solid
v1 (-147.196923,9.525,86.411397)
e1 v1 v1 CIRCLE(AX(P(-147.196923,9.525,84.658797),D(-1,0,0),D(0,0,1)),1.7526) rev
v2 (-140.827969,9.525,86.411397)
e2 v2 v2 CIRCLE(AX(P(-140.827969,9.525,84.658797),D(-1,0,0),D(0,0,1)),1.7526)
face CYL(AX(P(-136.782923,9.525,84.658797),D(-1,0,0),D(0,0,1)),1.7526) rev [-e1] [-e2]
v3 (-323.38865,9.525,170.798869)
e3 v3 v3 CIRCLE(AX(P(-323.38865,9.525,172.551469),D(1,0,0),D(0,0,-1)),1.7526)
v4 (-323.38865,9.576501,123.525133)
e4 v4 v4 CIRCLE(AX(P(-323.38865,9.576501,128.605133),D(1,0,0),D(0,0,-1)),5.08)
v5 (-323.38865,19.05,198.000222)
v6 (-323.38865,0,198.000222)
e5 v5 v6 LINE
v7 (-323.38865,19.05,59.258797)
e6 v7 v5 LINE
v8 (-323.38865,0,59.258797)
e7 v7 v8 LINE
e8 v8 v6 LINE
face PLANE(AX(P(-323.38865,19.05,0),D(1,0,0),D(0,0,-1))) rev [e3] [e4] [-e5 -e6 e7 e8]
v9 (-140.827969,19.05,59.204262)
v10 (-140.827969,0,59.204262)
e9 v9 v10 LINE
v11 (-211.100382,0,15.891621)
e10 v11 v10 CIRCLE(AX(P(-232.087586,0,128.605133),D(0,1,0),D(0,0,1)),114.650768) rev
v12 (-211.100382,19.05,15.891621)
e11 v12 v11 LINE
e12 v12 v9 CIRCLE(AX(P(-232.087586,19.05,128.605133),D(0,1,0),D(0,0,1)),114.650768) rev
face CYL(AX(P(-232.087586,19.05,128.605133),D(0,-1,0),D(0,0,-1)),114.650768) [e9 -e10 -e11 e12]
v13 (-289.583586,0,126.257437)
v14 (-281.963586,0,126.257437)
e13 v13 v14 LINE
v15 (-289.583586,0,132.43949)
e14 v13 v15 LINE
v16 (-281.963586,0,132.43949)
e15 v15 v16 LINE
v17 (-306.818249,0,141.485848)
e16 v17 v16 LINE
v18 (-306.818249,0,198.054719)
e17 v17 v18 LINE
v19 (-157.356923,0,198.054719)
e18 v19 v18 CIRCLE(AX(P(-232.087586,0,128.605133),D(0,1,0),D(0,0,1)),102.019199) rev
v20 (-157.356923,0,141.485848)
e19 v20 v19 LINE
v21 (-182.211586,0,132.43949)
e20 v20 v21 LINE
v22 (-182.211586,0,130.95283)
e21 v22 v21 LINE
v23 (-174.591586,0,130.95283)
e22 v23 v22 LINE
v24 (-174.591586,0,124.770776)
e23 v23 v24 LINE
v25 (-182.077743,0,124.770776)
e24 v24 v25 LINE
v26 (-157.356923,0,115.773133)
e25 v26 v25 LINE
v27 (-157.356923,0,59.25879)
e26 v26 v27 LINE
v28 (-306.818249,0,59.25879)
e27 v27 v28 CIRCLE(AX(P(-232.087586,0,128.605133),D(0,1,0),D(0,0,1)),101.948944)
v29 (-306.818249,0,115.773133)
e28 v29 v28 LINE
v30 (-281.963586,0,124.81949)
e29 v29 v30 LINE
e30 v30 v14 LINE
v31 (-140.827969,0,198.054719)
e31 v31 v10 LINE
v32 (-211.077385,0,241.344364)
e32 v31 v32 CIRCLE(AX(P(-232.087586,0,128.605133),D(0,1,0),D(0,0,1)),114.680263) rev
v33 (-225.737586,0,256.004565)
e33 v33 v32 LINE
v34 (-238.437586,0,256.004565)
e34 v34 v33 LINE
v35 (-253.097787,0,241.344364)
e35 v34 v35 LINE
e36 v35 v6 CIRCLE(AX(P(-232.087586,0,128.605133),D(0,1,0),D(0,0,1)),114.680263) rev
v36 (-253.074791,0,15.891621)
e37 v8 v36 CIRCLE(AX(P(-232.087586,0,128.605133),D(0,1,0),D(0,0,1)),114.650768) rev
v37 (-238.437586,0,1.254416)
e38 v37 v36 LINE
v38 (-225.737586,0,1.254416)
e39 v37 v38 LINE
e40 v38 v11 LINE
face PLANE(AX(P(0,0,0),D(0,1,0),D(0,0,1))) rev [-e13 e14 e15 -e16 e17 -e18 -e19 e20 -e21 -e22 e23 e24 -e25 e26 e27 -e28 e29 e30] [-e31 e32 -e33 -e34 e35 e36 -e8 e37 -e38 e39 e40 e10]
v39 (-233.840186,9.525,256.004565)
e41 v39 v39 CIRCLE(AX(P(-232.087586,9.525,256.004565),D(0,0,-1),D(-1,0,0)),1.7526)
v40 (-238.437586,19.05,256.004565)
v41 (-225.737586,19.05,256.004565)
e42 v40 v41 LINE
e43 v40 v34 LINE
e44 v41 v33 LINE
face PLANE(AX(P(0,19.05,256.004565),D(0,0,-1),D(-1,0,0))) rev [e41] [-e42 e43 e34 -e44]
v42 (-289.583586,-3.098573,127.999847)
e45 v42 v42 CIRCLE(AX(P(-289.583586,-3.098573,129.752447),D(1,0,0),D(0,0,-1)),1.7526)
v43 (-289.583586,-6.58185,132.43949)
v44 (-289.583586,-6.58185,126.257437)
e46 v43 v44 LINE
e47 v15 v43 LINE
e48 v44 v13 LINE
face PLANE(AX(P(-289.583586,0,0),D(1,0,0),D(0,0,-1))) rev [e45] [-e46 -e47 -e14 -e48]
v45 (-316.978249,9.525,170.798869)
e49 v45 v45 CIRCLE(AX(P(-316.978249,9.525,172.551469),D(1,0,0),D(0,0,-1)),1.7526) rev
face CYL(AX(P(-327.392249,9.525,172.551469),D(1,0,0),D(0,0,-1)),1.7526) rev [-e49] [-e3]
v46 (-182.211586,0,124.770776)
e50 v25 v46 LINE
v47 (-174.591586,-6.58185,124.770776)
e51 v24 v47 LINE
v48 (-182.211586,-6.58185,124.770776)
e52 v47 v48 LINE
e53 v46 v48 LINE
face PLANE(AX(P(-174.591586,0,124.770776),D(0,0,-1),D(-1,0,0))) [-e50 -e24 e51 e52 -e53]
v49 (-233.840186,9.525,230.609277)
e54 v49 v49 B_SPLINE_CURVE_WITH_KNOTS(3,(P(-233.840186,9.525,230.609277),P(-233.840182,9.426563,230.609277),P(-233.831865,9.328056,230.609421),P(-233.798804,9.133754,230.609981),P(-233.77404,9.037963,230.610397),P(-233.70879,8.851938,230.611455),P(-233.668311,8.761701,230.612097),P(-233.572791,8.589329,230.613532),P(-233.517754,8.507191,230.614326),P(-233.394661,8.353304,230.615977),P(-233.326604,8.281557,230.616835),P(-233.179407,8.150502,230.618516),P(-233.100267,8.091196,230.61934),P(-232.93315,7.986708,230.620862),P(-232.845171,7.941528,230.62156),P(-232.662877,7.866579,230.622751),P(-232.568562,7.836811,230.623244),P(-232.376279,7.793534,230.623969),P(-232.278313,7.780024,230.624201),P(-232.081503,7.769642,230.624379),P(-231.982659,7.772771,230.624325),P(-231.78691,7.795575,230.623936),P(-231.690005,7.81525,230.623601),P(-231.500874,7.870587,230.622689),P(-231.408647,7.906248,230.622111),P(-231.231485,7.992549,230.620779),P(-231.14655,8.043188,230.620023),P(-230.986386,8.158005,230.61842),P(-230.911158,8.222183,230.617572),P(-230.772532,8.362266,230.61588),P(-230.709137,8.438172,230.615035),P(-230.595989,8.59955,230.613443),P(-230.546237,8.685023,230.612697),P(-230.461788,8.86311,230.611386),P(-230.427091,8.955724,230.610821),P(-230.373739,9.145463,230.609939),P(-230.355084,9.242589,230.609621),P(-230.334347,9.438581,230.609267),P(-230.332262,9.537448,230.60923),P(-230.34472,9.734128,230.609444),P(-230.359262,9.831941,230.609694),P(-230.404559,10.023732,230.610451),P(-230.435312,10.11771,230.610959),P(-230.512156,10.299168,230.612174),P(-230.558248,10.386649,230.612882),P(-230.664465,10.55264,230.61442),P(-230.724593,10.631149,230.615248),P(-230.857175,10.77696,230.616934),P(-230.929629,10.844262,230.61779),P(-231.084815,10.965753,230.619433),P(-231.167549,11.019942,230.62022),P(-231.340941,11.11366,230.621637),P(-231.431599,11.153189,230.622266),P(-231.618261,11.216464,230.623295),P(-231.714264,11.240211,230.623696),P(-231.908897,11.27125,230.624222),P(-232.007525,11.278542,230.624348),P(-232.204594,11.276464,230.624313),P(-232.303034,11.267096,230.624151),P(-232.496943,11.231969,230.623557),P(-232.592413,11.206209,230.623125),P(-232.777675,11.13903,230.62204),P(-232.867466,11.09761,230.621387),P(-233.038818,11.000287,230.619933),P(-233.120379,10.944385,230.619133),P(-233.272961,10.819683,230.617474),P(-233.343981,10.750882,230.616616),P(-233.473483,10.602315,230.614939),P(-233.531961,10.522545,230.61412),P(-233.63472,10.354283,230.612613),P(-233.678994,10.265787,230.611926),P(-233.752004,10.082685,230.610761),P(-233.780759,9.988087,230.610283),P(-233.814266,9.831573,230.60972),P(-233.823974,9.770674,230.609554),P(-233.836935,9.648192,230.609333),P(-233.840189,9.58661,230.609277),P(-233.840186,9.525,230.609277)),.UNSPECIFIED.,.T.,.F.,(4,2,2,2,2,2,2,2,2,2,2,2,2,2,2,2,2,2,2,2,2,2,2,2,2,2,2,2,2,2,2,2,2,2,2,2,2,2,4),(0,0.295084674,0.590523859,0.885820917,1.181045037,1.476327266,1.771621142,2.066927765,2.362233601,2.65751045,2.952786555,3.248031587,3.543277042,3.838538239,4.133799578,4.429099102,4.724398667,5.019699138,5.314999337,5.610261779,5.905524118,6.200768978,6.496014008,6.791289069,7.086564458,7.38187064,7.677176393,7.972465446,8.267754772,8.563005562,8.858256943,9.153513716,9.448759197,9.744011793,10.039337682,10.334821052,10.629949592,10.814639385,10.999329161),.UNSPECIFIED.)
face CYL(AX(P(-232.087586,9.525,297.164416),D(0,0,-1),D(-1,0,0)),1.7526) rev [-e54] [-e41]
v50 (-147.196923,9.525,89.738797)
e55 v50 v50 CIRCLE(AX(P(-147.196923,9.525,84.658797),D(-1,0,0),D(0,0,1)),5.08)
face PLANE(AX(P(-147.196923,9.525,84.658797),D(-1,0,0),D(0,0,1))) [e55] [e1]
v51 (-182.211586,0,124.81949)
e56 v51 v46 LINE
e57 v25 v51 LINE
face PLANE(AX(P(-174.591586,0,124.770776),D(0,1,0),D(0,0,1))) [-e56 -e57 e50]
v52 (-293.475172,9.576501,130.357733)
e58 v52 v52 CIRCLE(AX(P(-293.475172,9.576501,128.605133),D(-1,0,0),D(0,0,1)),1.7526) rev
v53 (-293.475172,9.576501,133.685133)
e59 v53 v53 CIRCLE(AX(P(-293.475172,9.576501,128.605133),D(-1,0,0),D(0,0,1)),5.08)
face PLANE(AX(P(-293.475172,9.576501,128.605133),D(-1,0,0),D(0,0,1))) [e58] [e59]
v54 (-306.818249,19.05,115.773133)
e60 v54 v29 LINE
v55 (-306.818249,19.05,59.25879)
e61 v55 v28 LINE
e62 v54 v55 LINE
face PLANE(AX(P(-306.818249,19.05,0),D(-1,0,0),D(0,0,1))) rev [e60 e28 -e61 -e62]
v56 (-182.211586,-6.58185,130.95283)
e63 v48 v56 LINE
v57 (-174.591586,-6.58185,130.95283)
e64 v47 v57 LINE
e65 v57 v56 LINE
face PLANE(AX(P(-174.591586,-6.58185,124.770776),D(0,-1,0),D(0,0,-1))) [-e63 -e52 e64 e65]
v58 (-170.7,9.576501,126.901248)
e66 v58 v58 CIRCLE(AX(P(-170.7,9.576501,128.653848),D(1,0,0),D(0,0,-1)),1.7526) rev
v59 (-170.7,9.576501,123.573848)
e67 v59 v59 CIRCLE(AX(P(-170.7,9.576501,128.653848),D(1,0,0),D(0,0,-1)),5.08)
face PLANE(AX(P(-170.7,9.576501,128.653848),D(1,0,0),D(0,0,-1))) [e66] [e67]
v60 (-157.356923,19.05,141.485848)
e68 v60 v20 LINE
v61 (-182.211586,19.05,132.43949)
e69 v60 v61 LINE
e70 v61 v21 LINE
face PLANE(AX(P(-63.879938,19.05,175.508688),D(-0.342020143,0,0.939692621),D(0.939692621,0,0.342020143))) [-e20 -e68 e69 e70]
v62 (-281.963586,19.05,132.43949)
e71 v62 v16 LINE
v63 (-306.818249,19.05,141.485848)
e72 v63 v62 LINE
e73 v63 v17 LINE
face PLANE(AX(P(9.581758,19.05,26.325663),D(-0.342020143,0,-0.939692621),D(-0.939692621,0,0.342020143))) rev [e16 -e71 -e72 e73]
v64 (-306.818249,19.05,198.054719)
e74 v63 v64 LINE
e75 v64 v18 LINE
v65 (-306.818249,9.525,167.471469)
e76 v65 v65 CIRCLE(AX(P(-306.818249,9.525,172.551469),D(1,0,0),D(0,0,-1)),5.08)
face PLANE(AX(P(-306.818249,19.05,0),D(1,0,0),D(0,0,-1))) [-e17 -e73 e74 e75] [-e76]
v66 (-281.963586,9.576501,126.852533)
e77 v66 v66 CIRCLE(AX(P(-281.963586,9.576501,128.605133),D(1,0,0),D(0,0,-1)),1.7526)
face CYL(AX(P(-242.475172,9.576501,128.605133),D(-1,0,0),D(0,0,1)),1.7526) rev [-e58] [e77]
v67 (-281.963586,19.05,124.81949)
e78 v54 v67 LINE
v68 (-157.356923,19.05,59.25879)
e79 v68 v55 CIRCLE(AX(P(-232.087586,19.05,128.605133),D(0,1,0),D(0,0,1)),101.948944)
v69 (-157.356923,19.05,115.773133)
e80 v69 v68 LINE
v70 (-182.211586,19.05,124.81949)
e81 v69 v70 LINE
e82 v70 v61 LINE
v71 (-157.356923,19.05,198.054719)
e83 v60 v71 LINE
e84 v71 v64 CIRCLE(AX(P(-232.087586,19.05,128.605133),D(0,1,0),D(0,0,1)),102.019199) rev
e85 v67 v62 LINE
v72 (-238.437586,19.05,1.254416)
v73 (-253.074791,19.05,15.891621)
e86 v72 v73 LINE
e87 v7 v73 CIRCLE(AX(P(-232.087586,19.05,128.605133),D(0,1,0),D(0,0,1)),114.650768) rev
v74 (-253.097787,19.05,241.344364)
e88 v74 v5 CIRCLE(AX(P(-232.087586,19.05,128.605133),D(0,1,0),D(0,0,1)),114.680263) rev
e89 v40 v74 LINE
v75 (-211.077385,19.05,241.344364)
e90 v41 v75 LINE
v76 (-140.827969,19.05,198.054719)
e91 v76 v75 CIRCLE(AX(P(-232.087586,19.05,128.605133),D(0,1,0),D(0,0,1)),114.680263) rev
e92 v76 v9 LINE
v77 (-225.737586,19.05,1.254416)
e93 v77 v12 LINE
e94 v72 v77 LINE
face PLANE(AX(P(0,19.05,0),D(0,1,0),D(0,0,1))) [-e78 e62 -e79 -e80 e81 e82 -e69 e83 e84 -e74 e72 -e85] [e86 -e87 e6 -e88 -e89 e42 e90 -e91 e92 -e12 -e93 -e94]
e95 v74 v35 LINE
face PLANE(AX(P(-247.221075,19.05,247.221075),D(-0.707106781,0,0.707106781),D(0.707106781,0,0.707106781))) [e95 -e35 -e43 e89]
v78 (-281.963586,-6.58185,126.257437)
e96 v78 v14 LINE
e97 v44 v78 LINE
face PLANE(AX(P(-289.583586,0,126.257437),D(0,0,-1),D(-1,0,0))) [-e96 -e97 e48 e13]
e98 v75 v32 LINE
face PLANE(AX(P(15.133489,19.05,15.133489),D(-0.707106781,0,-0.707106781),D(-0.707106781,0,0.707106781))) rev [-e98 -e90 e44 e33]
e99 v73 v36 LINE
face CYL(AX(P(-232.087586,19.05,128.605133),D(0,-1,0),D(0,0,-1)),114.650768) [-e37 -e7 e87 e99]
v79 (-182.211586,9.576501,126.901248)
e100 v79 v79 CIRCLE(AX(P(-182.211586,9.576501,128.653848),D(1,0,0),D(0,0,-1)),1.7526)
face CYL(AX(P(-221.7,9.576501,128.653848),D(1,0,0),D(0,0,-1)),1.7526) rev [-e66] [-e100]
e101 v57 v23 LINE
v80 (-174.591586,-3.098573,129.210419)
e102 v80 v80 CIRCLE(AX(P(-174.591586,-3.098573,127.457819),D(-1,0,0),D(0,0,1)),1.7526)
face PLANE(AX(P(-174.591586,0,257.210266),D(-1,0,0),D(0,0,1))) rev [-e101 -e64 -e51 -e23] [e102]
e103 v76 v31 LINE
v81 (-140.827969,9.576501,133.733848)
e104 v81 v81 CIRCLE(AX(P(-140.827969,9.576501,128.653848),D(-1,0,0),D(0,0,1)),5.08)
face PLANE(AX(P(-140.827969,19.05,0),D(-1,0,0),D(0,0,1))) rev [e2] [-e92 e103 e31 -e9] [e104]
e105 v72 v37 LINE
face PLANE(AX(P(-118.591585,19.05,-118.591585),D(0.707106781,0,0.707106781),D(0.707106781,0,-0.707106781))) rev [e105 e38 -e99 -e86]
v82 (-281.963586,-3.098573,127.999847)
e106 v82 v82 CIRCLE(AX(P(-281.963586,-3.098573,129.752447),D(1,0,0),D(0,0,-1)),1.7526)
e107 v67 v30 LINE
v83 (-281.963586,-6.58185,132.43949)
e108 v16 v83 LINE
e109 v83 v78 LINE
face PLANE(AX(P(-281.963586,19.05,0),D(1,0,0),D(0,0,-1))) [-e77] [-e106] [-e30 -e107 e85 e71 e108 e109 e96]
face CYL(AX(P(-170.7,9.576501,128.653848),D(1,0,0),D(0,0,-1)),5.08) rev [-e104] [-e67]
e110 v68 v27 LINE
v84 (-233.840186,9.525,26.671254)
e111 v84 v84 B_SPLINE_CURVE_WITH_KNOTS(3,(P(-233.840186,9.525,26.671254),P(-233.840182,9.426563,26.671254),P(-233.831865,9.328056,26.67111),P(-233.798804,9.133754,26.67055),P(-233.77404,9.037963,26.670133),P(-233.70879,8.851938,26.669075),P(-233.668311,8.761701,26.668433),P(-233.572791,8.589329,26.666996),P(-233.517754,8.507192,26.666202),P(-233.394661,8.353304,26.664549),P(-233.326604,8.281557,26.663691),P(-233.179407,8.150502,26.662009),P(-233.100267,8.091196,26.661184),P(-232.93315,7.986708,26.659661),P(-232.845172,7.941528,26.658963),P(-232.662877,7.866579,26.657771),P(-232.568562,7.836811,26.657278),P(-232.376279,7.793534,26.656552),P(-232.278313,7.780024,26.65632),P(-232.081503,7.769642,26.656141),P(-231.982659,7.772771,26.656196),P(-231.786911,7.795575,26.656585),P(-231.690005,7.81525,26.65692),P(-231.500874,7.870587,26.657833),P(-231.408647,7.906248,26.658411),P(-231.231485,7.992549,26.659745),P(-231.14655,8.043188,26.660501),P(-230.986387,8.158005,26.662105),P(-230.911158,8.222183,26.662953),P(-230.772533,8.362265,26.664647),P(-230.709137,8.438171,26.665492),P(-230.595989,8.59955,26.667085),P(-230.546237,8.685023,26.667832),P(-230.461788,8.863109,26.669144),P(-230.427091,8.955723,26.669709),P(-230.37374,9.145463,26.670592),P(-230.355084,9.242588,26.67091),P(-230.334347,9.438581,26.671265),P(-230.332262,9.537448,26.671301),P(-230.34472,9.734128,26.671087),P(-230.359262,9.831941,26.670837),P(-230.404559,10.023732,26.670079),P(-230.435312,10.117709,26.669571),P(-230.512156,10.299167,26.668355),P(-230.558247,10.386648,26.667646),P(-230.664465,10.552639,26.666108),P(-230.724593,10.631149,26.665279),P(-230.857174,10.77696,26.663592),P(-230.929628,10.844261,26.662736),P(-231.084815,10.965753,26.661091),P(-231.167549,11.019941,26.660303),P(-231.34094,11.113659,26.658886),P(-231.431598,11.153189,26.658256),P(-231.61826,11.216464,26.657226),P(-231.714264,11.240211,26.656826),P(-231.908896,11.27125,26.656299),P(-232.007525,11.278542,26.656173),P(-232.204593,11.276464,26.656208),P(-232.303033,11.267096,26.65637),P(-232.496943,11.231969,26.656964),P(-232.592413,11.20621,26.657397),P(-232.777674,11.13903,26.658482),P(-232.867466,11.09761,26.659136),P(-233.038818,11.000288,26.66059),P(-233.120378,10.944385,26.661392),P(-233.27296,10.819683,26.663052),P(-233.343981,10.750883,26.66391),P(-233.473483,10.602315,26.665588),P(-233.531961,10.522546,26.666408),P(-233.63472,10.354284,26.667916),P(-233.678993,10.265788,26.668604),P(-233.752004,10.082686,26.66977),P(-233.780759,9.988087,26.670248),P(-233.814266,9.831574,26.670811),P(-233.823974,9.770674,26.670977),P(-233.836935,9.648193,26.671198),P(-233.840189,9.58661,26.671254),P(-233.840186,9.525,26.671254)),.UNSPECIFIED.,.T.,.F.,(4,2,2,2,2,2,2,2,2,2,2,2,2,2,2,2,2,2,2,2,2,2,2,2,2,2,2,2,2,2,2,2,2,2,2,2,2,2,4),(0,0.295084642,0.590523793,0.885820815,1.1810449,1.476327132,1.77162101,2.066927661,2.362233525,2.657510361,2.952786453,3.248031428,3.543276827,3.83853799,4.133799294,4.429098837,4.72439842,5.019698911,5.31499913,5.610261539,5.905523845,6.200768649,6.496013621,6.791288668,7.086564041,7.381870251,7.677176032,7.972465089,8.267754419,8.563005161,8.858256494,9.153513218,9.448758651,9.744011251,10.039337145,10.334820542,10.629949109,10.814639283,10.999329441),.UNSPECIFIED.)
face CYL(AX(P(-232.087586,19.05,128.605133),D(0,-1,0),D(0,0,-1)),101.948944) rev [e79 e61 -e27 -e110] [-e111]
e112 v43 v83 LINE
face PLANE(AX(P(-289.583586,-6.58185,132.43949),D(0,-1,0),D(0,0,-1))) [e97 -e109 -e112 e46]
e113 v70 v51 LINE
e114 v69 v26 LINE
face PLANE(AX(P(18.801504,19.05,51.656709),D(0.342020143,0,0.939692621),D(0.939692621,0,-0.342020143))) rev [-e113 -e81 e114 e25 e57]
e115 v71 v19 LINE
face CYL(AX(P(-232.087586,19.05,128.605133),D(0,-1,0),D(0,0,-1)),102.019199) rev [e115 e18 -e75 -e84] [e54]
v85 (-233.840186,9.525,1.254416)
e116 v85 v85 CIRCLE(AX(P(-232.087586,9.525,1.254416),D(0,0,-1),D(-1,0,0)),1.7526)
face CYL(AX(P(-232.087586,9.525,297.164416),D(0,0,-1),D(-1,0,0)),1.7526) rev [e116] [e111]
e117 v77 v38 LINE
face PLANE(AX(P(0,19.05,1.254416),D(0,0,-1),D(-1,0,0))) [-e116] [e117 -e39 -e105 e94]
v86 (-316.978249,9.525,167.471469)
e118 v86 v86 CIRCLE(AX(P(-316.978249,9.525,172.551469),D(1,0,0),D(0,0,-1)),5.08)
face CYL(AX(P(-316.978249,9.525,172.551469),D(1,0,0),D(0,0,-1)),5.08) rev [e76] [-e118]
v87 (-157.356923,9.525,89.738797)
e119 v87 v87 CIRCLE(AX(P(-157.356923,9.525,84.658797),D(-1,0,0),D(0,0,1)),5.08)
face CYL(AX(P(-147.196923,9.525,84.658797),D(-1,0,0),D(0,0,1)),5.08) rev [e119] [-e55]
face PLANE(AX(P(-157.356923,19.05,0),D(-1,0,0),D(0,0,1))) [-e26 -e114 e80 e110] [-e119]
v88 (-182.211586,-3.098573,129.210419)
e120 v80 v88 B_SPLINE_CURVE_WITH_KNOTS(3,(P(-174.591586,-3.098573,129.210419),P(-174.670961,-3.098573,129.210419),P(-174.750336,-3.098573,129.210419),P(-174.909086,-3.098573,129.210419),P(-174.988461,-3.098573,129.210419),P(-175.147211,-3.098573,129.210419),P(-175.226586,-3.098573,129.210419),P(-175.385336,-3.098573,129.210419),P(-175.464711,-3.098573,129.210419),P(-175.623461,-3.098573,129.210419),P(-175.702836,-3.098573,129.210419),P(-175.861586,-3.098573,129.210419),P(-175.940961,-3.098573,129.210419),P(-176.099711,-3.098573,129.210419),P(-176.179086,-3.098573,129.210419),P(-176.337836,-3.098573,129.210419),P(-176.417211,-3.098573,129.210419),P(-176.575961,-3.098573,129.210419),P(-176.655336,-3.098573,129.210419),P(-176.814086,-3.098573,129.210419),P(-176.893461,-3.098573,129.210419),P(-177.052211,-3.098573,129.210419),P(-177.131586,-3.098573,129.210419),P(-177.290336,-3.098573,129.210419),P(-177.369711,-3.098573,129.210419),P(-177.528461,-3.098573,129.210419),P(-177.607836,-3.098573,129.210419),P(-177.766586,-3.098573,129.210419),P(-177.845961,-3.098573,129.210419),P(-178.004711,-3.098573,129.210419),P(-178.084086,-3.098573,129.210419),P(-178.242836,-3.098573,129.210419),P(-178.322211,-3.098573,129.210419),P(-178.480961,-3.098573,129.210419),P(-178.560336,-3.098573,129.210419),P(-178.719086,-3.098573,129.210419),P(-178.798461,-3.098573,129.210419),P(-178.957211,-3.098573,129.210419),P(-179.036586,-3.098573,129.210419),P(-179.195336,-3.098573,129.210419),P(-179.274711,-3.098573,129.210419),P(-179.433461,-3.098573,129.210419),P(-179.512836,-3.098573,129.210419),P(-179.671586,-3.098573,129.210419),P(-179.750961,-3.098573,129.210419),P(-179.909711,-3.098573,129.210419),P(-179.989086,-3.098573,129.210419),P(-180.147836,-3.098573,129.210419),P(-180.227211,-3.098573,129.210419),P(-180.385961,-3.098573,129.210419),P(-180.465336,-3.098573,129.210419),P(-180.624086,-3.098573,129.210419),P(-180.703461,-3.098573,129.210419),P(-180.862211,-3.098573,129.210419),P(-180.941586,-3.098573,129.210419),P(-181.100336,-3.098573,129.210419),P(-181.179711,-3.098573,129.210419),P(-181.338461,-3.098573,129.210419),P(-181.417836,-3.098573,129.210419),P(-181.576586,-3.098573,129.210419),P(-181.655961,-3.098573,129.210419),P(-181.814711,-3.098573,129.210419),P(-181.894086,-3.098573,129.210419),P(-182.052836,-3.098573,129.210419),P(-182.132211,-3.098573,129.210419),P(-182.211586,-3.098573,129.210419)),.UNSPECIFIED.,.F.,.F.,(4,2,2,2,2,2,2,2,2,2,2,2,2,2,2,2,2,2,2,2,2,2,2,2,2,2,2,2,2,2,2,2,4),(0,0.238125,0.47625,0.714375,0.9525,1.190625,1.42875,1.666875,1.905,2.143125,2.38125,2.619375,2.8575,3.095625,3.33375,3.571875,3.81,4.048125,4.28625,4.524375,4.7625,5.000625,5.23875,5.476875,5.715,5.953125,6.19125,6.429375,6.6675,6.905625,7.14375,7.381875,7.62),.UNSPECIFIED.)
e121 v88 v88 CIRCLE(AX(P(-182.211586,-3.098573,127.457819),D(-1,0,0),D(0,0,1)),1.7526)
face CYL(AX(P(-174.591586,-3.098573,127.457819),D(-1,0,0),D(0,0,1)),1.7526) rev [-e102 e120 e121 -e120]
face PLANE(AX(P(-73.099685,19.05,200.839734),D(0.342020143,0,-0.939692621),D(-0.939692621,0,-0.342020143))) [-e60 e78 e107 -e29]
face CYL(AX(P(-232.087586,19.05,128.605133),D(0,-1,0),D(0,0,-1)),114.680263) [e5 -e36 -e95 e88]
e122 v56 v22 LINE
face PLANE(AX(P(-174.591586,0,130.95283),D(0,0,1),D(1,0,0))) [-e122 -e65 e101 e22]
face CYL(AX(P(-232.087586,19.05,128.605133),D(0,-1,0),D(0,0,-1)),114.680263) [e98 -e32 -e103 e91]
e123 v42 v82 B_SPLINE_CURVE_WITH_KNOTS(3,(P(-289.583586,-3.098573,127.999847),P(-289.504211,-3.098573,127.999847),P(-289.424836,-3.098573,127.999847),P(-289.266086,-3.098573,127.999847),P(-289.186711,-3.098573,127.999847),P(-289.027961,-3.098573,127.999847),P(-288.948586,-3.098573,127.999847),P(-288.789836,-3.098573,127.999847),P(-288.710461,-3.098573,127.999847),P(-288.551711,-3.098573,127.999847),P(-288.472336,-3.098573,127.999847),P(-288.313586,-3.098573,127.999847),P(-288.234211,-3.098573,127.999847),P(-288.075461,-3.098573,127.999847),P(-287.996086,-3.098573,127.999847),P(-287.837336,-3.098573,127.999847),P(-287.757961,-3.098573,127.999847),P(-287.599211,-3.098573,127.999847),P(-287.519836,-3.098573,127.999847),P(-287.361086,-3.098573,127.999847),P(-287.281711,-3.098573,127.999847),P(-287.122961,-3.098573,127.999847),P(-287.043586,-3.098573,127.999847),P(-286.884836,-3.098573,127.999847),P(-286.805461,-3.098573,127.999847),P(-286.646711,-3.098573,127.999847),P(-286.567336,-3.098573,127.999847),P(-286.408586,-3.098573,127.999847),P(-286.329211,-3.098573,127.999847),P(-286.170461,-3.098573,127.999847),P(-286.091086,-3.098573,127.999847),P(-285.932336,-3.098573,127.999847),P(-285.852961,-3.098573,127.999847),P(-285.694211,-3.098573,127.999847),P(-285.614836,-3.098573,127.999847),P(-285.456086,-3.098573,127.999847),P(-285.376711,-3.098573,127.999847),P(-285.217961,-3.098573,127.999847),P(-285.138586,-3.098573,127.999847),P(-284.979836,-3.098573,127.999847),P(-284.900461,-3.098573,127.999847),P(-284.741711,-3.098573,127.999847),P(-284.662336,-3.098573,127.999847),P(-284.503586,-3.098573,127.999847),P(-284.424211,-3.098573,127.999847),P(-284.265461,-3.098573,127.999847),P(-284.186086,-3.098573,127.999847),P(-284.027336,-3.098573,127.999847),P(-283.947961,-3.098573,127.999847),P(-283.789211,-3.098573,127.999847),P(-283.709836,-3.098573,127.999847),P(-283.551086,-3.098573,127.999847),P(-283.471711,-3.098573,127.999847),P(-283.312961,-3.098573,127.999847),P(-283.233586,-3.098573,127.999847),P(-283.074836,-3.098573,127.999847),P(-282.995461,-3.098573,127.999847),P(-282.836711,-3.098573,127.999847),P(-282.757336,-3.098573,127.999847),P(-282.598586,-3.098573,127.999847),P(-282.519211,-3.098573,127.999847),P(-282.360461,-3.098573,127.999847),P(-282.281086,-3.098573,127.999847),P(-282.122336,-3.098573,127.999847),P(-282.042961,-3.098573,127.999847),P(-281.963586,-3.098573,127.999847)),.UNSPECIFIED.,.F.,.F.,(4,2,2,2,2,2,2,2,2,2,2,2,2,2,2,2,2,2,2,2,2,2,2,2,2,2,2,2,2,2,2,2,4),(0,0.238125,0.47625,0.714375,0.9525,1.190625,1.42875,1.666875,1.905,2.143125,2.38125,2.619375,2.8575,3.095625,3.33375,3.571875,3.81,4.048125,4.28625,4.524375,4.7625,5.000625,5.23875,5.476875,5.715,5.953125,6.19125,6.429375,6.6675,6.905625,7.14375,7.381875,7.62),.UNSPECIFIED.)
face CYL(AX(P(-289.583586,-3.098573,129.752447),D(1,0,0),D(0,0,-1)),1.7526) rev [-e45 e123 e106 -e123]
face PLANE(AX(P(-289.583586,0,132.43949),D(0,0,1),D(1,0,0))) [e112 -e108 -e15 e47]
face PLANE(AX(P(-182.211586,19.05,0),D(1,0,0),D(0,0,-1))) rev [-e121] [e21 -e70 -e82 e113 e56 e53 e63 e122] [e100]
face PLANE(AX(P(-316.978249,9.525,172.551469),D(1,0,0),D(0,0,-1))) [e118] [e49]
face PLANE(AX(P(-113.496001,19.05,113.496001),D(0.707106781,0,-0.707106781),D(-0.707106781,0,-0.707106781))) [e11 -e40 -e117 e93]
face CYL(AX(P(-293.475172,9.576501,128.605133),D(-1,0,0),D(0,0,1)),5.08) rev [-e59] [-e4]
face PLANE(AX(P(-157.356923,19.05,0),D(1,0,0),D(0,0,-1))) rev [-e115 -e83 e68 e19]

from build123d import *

# Parameters (mm, degrees)
BOSS_EXTRUDE1_DEPTH     = 19.05
SKETCH2_R               = 1.7526
CUT_EXTRUDE1_DEPTH      = 221.7
SKETCH3_R               = 5.08
CUT_EXTRUDE2_DEPTH      = 170.7
CIRPATTERN1_START       = -323.388650449
CIRPATTERN1_OUTLINE_R   = 5.08
CIRPATTERN1_DEPTH       = 29.913478247
CIRPATTERN1_START_2     = -293.475172202
CIRPATTERN1_2_OUTLINE_R = 1.7526
CIRPATTERN1_2_DEPTH     = 11.511586101
SKETCH5_R               = 1.7526
CUT_EXTRUDE3_DEPTH      = 295.91
SKETCH6_R               = 1.7526
CUT_EXTRUDE4_DEPTH      = 20.574
SKETCH7_R               = 5.08
CUT_EXTRUDE5_DEPTH      = 10.16
CIRPATTERN2_COUNT       = 2
SKETCH8_W               = 6.182053834
SKETCH8_H               = 6.581850062
SKETCH8_R               = 1.7526
BOSS_EXTRUDE2_DEPTH     = 7.62
CIRPATTERN3_COUNT       = 2


# Read off the part's stored shape, not the designer's step: CirPattern1
with BuildPart() as part:
    # Sketch1 → Boss-Extrude1 (new body)
    with BuildSketch(Plane(origin=(0, 0, 0), x_dir=(1, 0, 0), z_dir=(0, 1, 0))):
        with BuildLine():
            Line((-238.437586101, -1.254416157), (-253.074790503, -15.891620559))
            ThreePointArc((-253.074790503, -15.891620559), (-292.273480014, -31.022056532), (-323.388650449, -59.258797155))
            Line((-323.388650449, -59.258797155), (-323.388650449, -198.000222119))
            ThreePointArc((-323.388650449, -198.000222119), (-292.280058459, -226.218805317), (-253.09778688, -241.344364055))
            Line((-253.09778688, -241.344364055), (-253.074790503, -241.367360432))
            Line((-253.074790503, -241.367360432), (-238.437586101, -256.004564834))
            Line((-238.437586101, -256.004564834), (-225.737586101, -256.004564834))
            Line((-225.737586101, -256.004564834), (-211.100381699, -241.367360432))
            Line((-211.100381699, -241.367360432), (-211.077385322, -241.344364055))
            ThreePointArc((-211.077385322, -241.344364055), (-171.924255518, -226.236769292), (-140.827968899, -198.054719126))
            Line((-140.827968899, -198.054719126), (-140.827968899, -59.204261865))
            ThreePointArc((-140.827968899, -59.204261865), (-171.930845296, -31.004081905), (-211.100381699, -15.891620559))
            Line((-211.100381699, -15.891620559), (-225.737586101, -1.254416157))
            Line((-225.737586101, -1.254416157), (-238.437586101, -1.254416157))
        make_face()
        with BuildLine():
            Line((-281.963586101, -124.819490495), (-306.818249022, -115.773133009))
            Line((-306.818249022, -115.773133009), (-306.818249022, -59.258790155))
            ThreePointArc((-306.818249022, -59.258790155), (-232.087586101, -26.656188726), (-157.356923179, -59.258790155))
            Line((-157.356923179, -59.258790155), (-157.356923179, -115.773133009))
            Line((-157.356923179, -115.773133009), (-182.211586101, -124.819490495))
            Line((-182.211586101, -124.819490495), (-182.211586101, -132.439490495))
            Line((-182.211586101, -132.439490495), (-157.356923179, -141.485847982))
            Line((-157.356923179, -141.485847982), (-157.356923179, -198.054719126))
            ThreePointArc((-157.356923179, -198.054719126), (-232.087586101, -230.624332183), (-306.818249022, -198.054719126))
            Line((-306.818249022, -198.054719126), (-306.818249022, -141.485847982))
            Line((-306.818249022, -141.485847982), (-281.963586101, -132.439490495))
            Line((-281.963586101, -132.439490495), (-281.963586101, -124.819490495))
        make_face(mode=Mode.SUBTRACT)
    extrude(amount=BOSS_EXTRUDE1_DEPTH)

    # Sketch2 → Cut-Extrude1 (cut)
    with BuildSketch(Plane(origin=(0, 0, 0), x_dir=(0, 0, -1), z_dir=(1, 0, 0))):
        with Locations((-128.653847867, 9.576501184)):
            Circle(SKETCH2_R)
    extrude(amount=-CUT_EXTRUDE1_DEPTH, mode=Mode.SUBTRACT)

    # Sketch3 → Cut-Extrude2 (cut)
    with BuildSketch(Plane(origin=(0, 0, 0), x_dir=(0, 0, -1), z_dir=(1, 0, 0))):
        with Locations((-128.653847867, 9.576501184)):
            Circle(SKETCH3_R)
    extrude(amount=-CUT_EXTRUDE2_DEPTH, mode=Mode.SUBTRACT)

    # CirPattern1 outline → CirPattern1 (cut)
    with BuildSketch(Plane.YZ.offset(CIRPATTERN1_START)):
        with Locations((9.576501184, 128.605133124)):
            Circle(CIRPATTERN1_OUTLINE_R)
    extrude(amount=CIRPATTERN1_DEPTH, mode=Mode.SUBTRACT)

    # CirPattern1 2 outline → CirPattern1 2 (cut)
    with BuildSketch(Plane.YZ.offset(CIRPATTERN1_START_2)):
        with Locations((9.576501184, 128.605133124)):
            Circle(CIRPATTERN1_2_OUTLINE_R)
    extrude(amount=CIRPATTERN1_2_DEPTH, mode=Mode.SUBTRACT)

    # Sketch5 → Cut-Extrude3 (cut)
    with BuildSketch(Plane(origin=(0, 0, 1.254416157), x_dir=(-1, 0, 0), z_dir=(0, 0, -1))):
        with Locations((232.087586101, 9.525)):
            Circle(SKETCH5_R)
    extrude(amount=-CUT_EXTRUDE3_DEPTH, mode=Mode.SUBTRACT)

    # Sketch6 → Cut-Extrude4 (cut)
    with BuildSketch(Plane.ZY.offset(157.356923179)):
        with Locations((84.658797155, 9.525)):
            Circle(SKETCH6_R)
    cut_extrude4 = extrude(amount=-CUT_EXTRUDE4_DEPTH, mode=Mode.SUBTRACT)

    # Sketch7 → Cut-Extrude5 (cut)
    with BuildSketch(Plane.ZY.offset(157.356923179)):
        with Locations((84.658797155, 9.525)):
            Circle(SKETCH7_R)
    cut_extrude5 = extrude(amount=-CUT_EXTRUDE5_DEPTH, mode=Mode.SUBTRACT)

    # CirPattern2: Cut-Extrude4, Cut-Extrude5 ×2 about axis
    cirpattern2_axis = Axis((-232.087586101, 0, 128.605133124), (0, -1, 0))
    add([cut_extrude4.rotate(cirpattern2_axis, i * 360 / CIRPATTERN2_COUNT) for i in range(1, CIRPATTERN2_COUNT)], mode=Mode.SUBTRACT)
    add([cut_extrude5.rotate(cirpattern2_axis, i * 360 / CIRPATTERN2_COUNT) for i in range(1, CIRPATTERN2_COUNT)], mode=Mode.SUBTRACT)

    # Sketch8 → Boss-Extrude2 (add)
    with BuildSketch(Plane(origin=(-281.963586101, 0, 0), x_dir=(0, 0, -1), z_dir=(1, 0, 0))):
        with Locations((-129.348463578, -3.290925031)):
            Rectangle(SKETCH8_W, SKETCH8_H)
        with Locations((-129.752447072, -3.098573281)):
            Circle(SKETCH8_R, mode=Mode.SUBTRACT)
    boss_extrude2 = extrude(amount=-BOSS_EXTRUDE2_DEPTH)

    # CirPattern3: Boss-Extrude2 ×2 about axis
    cirpattern3_axis = Axis((-232.087586101, 0, 128.605133124), (0, 1, 0))
    for i in range(1, CIRPATTERN3_COUNT):
        add(boss_extrude2.rotate(cirpattern3_axis, i * 360 / CIRPATTERN3_COUNT))


solid = part.part
